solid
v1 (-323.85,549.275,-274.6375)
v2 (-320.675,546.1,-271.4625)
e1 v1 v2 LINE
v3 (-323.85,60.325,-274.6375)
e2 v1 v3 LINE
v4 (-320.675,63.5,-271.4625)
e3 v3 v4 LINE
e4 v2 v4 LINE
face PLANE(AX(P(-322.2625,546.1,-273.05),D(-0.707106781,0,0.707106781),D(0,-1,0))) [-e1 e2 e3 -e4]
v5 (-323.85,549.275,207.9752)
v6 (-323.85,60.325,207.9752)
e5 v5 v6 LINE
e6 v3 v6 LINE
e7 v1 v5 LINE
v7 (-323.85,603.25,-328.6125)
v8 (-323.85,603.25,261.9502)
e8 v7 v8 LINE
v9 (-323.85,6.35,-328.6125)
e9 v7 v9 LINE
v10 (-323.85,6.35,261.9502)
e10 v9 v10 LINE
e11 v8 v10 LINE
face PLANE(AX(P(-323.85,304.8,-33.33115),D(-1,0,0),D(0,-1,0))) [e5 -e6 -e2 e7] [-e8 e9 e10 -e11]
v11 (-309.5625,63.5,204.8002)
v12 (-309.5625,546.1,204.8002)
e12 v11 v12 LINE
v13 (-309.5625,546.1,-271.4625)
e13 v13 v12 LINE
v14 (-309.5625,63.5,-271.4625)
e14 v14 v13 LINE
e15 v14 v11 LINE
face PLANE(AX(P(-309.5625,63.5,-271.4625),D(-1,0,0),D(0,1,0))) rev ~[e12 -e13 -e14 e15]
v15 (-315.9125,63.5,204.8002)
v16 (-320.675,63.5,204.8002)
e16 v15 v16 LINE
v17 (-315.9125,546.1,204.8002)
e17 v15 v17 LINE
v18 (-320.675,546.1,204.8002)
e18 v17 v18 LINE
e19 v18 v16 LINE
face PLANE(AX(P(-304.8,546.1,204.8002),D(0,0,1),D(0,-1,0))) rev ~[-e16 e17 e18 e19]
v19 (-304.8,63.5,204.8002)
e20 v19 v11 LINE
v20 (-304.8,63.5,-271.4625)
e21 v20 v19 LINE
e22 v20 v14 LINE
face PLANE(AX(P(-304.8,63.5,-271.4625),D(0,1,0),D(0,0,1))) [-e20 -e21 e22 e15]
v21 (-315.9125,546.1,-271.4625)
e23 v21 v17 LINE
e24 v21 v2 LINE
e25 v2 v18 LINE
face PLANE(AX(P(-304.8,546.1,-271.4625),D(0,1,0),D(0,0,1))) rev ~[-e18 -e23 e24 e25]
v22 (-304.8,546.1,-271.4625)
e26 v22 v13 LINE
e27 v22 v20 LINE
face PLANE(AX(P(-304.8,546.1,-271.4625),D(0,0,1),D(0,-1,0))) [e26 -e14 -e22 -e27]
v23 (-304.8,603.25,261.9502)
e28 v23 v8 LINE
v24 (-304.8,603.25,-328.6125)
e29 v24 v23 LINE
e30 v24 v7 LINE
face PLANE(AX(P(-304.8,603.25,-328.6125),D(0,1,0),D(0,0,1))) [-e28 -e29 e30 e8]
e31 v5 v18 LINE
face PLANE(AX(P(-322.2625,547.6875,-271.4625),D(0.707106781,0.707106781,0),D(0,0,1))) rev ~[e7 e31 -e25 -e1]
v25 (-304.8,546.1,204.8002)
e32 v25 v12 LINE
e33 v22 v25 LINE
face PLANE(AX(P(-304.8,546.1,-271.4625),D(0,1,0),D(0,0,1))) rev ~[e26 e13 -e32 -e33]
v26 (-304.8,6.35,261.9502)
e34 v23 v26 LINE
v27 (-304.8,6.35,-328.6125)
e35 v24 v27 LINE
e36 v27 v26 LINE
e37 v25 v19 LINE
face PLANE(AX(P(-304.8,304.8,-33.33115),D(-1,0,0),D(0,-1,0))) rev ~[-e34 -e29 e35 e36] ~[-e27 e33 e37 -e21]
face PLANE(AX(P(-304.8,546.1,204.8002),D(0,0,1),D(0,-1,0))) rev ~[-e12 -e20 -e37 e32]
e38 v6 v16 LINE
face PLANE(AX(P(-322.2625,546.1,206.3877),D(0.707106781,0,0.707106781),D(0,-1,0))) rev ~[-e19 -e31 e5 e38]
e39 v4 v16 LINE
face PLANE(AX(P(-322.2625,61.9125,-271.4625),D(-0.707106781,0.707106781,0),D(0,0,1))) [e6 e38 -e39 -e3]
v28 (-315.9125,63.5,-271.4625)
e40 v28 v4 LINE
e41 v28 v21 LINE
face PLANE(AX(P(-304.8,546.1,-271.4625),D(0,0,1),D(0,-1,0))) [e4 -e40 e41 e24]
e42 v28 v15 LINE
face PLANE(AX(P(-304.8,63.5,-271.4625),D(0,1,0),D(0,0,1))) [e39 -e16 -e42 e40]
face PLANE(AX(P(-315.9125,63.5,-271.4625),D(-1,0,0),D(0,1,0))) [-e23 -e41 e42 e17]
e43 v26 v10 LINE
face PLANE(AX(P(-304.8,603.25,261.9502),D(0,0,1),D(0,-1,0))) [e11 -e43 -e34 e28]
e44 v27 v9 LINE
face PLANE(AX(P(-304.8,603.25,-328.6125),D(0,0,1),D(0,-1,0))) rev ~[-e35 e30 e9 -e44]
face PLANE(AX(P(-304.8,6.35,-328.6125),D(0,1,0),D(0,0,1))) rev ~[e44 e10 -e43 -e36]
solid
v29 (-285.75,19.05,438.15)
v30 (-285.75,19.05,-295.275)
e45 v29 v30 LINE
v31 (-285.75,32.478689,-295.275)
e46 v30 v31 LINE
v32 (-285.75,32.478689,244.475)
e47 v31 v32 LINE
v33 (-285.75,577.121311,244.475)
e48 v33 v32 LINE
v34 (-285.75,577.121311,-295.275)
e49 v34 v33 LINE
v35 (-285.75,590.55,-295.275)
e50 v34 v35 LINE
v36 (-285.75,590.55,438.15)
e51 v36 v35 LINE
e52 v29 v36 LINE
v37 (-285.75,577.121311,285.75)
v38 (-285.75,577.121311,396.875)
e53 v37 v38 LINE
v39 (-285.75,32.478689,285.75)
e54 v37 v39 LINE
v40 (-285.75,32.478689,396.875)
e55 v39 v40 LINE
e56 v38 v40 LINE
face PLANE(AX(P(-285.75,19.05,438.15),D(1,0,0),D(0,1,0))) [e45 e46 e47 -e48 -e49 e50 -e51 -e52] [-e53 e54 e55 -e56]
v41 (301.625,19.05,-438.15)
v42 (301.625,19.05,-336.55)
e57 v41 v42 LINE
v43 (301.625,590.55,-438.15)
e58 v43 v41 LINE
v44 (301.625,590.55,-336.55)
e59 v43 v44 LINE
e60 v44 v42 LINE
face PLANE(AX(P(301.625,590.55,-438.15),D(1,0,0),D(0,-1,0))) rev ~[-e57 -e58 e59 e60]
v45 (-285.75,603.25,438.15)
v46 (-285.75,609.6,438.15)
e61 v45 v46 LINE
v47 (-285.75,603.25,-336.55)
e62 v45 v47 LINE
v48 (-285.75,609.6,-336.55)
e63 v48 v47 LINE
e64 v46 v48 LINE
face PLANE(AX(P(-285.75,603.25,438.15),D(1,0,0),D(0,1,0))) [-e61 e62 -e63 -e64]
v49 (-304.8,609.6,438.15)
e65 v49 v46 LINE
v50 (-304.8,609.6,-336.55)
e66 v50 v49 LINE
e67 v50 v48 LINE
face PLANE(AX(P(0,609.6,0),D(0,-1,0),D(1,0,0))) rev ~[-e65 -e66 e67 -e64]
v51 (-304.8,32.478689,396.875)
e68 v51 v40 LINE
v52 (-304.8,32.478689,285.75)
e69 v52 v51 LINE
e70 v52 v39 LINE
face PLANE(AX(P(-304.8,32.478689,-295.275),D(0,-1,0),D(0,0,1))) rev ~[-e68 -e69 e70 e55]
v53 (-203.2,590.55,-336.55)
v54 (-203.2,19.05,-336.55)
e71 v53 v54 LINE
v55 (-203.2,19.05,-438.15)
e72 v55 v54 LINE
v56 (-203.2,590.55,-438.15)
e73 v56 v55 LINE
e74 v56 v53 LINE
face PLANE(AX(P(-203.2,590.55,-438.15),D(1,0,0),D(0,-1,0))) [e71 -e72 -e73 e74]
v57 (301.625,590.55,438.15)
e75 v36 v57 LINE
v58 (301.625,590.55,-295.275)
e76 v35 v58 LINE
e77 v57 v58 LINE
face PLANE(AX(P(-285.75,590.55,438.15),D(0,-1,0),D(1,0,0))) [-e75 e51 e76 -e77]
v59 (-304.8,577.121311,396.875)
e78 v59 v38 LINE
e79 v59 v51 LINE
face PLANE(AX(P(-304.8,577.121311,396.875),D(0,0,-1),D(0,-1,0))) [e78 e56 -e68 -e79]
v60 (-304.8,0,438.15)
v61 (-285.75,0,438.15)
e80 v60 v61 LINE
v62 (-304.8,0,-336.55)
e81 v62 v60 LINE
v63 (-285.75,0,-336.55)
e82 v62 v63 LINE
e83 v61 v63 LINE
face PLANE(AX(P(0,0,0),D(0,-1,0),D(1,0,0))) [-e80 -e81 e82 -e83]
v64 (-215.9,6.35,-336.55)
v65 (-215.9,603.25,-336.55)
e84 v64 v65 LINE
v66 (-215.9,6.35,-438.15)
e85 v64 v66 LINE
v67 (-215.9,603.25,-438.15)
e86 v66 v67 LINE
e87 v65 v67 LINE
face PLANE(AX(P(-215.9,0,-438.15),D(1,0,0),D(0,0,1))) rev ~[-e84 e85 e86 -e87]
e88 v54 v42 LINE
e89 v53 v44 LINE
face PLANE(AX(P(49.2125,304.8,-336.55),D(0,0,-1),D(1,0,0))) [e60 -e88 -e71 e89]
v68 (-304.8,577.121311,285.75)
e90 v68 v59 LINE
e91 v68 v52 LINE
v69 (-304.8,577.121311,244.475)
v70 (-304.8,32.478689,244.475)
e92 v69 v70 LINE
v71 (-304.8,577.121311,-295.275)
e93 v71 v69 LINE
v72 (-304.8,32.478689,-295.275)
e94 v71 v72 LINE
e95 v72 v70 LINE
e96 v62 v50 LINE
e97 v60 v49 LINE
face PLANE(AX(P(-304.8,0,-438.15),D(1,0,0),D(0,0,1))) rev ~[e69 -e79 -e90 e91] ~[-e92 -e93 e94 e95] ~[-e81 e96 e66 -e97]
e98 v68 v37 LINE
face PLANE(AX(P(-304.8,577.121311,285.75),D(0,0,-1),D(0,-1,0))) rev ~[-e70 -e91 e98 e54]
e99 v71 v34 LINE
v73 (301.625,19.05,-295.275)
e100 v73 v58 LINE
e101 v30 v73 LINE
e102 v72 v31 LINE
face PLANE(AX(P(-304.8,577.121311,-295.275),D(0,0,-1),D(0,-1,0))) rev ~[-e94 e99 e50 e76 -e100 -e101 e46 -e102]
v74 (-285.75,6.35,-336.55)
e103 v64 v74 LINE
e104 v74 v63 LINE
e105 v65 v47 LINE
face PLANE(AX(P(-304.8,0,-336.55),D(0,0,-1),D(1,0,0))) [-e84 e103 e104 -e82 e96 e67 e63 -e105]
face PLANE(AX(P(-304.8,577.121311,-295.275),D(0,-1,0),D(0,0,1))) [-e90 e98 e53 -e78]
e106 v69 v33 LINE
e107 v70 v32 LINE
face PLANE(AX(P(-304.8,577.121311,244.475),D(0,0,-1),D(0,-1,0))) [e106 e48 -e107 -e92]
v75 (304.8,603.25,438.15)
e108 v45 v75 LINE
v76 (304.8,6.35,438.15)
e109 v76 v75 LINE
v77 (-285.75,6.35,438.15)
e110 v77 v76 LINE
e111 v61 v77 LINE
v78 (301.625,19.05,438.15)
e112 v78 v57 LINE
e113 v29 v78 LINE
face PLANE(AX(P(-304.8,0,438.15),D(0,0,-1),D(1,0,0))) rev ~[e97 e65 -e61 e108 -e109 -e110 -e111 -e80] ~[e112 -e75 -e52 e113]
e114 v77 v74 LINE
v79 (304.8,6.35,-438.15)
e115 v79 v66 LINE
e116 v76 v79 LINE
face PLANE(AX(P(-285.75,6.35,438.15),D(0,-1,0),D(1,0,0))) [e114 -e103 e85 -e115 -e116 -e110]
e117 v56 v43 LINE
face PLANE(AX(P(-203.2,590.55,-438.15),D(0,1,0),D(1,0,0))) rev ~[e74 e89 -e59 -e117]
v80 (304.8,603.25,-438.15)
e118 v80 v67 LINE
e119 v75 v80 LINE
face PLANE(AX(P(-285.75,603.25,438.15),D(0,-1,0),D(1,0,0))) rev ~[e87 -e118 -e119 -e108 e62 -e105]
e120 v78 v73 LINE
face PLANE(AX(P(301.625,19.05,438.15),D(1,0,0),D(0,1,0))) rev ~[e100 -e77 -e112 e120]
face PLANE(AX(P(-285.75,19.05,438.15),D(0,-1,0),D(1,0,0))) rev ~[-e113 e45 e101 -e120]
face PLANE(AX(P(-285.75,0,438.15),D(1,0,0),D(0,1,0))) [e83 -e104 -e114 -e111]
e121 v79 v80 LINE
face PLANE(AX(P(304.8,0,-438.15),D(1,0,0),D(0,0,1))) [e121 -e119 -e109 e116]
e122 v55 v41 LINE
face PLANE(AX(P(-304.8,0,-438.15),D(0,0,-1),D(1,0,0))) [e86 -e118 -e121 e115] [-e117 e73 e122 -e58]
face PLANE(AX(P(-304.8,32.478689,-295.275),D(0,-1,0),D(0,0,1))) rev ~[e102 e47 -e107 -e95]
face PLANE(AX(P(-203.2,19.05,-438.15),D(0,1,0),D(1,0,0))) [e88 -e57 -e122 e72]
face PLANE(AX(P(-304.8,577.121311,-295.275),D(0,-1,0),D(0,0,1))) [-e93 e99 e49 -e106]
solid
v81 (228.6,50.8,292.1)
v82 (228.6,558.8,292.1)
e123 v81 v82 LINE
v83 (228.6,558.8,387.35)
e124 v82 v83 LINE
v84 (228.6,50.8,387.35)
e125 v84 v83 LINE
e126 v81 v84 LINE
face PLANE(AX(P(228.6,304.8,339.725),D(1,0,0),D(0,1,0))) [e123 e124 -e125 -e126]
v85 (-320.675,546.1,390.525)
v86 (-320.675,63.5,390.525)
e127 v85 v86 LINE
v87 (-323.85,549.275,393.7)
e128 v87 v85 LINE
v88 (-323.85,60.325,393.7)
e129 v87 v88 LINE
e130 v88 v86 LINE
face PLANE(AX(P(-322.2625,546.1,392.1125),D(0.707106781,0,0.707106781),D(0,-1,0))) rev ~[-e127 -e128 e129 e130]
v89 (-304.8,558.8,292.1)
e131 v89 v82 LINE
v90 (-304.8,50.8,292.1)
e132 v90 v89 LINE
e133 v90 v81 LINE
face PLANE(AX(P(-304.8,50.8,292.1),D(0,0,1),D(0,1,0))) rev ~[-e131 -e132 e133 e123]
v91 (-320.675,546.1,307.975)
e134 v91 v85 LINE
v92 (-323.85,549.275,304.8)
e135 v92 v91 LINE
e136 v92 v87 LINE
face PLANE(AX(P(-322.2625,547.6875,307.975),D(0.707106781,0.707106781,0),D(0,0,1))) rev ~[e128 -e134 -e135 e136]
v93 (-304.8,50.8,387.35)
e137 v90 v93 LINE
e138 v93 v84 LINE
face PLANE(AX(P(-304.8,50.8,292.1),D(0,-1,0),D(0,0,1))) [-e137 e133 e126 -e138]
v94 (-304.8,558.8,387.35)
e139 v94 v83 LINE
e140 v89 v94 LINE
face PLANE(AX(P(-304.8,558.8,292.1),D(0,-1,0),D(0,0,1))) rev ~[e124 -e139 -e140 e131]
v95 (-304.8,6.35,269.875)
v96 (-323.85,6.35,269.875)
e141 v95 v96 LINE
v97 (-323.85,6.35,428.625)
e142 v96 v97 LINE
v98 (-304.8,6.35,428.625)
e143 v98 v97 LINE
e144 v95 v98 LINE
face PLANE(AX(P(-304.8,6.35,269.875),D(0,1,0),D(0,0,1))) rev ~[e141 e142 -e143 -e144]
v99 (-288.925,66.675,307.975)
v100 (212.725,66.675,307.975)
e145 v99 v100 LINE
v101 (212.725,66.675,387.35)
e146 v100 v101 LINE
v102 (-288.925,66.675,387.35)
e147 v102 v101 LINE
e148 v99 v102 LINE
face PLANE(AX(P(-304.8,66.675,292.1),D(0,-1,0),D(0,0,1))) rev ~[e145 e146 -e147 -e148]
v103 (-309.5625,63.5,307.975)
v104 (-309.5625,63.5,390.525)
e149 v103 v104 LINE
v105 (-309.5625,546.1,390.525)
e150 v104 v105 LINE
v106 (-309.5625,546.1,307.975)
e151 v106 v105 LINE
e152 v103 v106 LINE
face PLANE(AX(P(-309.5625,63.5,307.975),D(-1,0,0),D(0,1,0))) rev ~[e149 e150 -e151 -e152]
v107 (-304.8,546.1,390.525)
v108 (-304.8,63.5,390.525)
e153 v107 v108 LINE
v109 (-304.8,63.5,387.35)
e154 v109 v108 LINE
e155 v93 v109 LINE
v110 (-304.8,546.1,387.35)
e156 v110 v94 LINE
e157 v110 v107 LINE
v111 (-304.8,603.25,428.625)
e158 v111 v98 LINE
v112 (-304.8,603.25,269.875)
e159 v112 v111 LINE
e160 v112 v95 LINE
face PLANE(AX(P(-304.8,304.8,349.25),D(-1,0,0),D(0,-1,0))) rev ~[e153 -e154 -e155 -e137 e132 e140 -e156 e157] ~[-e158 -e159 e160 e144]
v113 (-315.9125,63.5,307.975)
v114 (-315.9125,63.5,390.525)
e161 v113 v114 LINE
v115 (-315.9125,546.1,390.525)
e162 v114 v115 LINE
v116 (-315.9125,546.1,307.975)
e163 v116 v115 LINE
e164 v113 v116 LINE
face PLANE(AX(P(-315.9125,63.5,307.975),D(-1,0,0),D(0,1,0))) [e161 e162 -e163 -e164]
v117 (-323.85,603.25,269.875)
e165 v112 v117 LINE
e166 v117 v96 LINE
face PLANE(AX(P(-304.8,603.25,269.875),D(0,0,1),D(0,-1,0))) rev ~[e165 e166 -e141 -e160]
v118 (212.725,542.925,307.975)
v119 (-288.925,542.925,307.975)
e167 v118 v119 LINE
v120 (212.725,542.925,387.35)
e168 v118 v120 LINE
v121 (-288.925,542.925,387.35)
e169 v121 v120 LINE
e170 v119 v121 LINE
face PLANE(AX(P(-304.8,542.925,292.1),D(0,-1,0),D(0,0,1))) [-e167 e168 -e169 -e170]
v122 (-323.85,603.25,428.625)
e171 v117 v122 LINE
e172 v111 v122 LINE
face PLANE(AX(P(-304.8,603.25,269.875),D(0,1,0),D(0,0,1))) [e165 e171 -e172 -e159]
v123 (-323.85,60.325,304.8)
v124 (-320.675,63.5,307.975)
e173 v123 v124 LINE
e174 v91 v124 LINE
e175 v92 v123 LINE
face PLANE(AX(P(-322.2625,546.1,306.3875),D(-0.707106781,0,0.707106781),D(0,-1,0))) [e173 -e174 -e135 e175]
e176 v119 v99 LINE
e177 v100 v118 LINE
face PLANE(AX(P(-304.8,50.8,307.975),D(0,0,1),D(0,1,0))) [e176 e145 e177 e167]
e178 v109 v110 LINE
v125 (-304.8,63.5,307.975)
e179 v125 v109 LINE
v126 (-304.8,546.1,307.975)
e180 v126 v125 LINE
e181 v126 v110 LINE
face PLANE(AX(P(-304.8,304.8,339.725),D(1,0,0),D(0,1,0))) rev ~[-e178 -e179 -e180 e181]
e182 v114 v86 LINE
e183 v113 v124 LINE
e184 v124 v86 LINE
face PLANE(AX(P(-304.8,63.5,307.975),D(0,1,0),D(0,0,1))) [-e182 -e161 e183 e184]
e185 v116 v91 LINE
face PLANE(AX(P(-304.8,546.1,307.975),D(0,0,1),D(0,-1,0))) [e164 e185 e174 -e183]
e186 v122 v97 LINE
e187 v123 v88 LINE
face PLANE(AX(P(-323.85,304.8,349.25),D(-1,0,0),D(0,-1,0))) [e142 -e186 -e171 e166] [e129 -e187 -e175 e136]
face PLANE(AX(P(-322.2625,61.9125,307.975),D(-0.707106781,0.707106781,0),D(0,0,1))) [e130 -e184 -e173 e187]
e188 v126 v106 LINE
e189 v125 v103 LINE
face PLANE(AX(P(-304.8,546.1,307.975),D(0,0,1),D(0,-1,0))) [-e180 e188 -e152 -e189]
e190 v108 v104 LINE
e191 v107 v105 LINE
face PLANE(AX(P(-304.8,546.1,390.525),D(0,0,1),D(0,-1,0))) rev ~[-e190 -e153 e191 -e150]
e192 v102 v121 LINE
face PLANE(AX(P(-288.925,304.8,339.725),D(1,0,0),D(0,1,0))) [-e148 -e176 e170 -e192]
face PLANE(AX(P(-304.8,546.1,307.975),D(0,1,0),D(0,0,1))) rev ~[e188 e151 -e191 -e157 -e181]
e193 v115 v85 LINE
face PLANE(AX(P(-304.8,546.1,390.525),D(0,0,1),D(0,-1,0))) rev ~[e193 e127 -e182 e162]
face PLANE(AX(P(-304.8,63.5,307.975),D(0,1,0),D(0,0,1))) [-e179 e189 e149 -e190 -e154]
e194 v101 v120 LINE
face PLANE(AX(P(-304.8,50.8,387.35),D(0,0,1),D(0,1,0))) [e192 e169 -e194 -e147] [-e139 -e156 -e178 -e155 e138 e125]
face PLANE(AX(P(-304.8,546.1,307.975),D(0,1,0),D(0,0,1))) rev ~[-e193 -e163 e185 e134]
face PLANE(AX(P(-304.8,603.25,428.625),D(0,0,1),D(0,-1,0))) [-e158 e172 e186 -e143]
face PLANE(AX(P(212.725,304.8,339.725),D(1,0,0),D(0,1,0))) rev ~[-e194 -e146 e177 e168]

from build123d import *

# Parameters (mm, degrees)
F0_W          = 609.6
F0_H          = 876.3
F1_DEPTH      = 609.6
F2_W          = 88.9
F2_H          = 101.6
F3_DEPTH      = 609.601
F4_W          = 544.6426229508
F4_H          = 692.15
F5_DEPTH      = 19.05
F6_W          = 590.55
F6_H          = 6.35
F7_DEPTH      = 876.301
F8_W          = 587.375
F8_H          = 571.5
F9_DEPTH      = 733.425
F10_W         = 544.6426229508
F10_H         = 41.275
F11_DEPTH     = 19.05
F12_W         = 596.9
F12_H         = 590.5627
F12_W_2       = 482.6
F12_H_2       = 476.2627
F13_DEPTH     = 19.05
F14_W         = 6.35
F14_H         = 482.6
F15_DEPTH     = 476.2627
F16_SIZE      = 3.175
F17_W         = 596.9
F17_H         = 158.75
F17_W_2       = 482.6
F17_H_2       = 82.55
F18_DEPTH     = 19.05
F19_W         = 6.35
F19_H         = 482.6
F20_DEPTH     = 82.55
F21_SIZE      = 3.175
F22_W         = 504.825
F22_H         = 571.5
F23_DEPTH     = 101.6
F24_W         = 508
F24_H         = 95.25
F25_DEPTH     = 533.4
F26_T         = 15.875
F26_T3_DEPTH  = 37.249261314
F26_T5_DEPTH  = 37.249261314
F26_T7_DEPTH  = 37.249261314
F26_T9_DEPTH  = 37.249261314
F26_T11_DEPTH = 36.5125
F26_T13_DEPTH = 514.35
F26_T15_DEPTH = 114.3
F26_T17_DEPTH = 127
F26_T19_DEPTH = 539.75
F26_T21_DEPTH = 111.125
F26_T23_DEPTH = 36.5125


# Not quite as in the source:
# - a shell that OpenCascade refuses in one call is made with other operations: the cavity is built on its own and cut out


with BuildPart() as f1:
    # F0 (on Front) → F1 (new body)
    with BuildSketch(Plane.XZ):
        Rectangle(F0_W, F0_H)
    extrude(amount=-F1_DEPTH)

    # F2 (on face) → F3 (cut, through all)
    with BuildSketch(Plane.XZ):
        with Locations((-260.35, -387.35)):
            Rectangle(F2_W, F2_H)
    extrude(amount=-F3_DEPTH, mode=Mode.SUBTRACT)

    # F4 (on face) → F5 (cut)
    with BuildSketch(Plane(origin=(-304.8, 0, 0), x_dir=(0, -1, 0), z_dir=(-1, 0, 0))):
        with Locations((-304.8, 50.8)):
            Rectangle(F4_W, F4_H)
    extrude(amount=-F5_DEPTH, mode=Mode.SUBTRACT)

    # F6 (on face) → F7 (cut, through all)
    with BuildSketch(Plane.XY.offset(438.15)):
        with Locations((9.525, 606.425)):
            Rectangle(F6_W, F6_H)
        with Locations((9.525, 3.175)):
            Rectangle(F6_W, F6_H)
    extrude(amount=-F7_DEPTH, mode=Mode.SUBTRACT)

    # F8 (on face) → F9 (cut, through all)
    with BuildSketch(Plane.XY.offset(438.15)):
        with Locations((7.9375, 304.8)):
            Rectangle(F8_W, F8_H)
    extrude(amount=-F9_DEPTH, mode=Mode.SUBTRACT)

    # F10 (on face) → F11 (join, through all)
    with BuildSketch(Plane(origin=(-304.8, 0, 0), x_dir=(0, -1, 0), z_dir=(-1, 0, 0))):
        with Locations((-304.8, 265.1125)):
            Rectangle(F10_W, F10_H)
    extrude(amount=-F11_DEPTH)

    # F22 (on face) → F23 (cut)
    with BuildSketch(Plane(origin=(0, 0, -438.15), x_dir=(1, 0, 0), z_dir=(0, 0, -1))):
        with Locations((49.2125, -304.8)):
            Rectangle(F22_W, F22_H)
    extrude(amount=-F23_DEPTH, mode=Mode.SUBTRACT)


with BuildPart() as f13:
    # F12 (on face) → F13 (new body)
    with BuildSketch(Plane(origin=(-304.8, 0, 0), x_dir=(0, -1, 0), z_dir=(-1, 0, 0))):
        with Locations((-304.8, -33.33115)):
            Rectangle(F12_W, F12_H)
        with Locations((-304.8, -33.33115)):
            Rectangle(F12_W_2, F12_H_2, mode=Mode.SUBTRACT)
    extrude(amount=F13_DEPTH)

    # F14 (on face) → F15 (join, through all)
    with BuildSketch(Plane.XY.offset(-271.4625)):
        with Locations((-312.7375, 304.8)):
            Rectangle(F14_W, F14_H)
    extrude(amount=F15_DEPTH)

    # F16
    f16_edges = [f13.edges().sort_by_distance(p)[0] for p in [
        (-323.85, 546.1, -33.33115),
        (-323.85, 304.8, -271.4625),
        (-323.85, 63.5, -33.33115),
        (-323.85, 304.8, 204.8002),
    ]]
    chamfer(f16_edges, length=F16_SIZE)


with BuildPart() as f18:
    # F17 (on face) → F18 (new body)
    with BuildSketch(Plane(origin=(-304.8, 0, 0), x_dir=(0, -1, 0), z_dir=(-1, 0, 0))):
        with Locations((-304.8, 349.25)):
            Rectangle(F17_W, F17_H)
        with Locations((-304.8, 349.25)):
            Rectangle(F17_W_2, F17_H_2, mode=Mode.SUBTRACT)
    extrude(amount=F18_DEPTH)

    # F19 (on face) → F20 (join, through all)
    with BuildSketch(Plane.XY.offset(307.975)):
        with Locations((-312.7375, 304.8)):
            Rectangle(F19_W, F19_H)
    extrude(amount=F20_DEPTH)

    # F21
    f21_edges = [f18.edges().sort_by_distance(p)[0] for p in [
        (-323.85, 304.8, 307.975),
        (-323.85, 546.1, 349.25),
        (-323.85, 304.8, 390.525),
        (-323.85, 63.5, 349.25),
    ]]
    chamfer(f21_edges, length=F21_SIZE)

    # F24 (on face) → F25 (join)
    with BuildSketch(Plane.YZ.offset(-304.8)):
        with Locations((304.8, 339.725)):
            Rectangle(F24_W, F24_H)
    extrude(amount=F25_DEPTH)

    # F26: shell of thickness 15.875, made by hand


with BuildPart() as f26_core1:
    # F26_t2: copy of F18
    add(f18.part)

    # the walls: a layer under each face that stays
    f26_faces = [f26_core1.faces().sort_by_distance(p)[0] for p in [
        (-323.85, 503.7666666667, 296.3333333333),
        (-322.2625, 304.8, 306.3875),
        (-322.2625, 61.9125, 349.25),
        (-322.2625, 547.6875, 349.25),
        (-322.2625, 304.8, 392.1125),
        (-314.325, 304.8, 428.625),
        (-314.325, 603.25, 349.25),
        (-314.325, 304.8, 269.875),
        (-314.325, 6.35, 349.25),
        (-318.29375, 304.8, 307.975),
        (-318.29375, 63.5, 349.25),
        (-318.29375, 546.1, 349.25),
        (-318.29375, 304.8, 390.525),
        (-304.8, 503.7666666667, 402.1666666667),
        (-315.9125, 304.8, 349.25),
        (-38.1, 558.8, 339.725),
        (-38.1, 304.8, 292.1),
        (-38.1, 50.8, 339.725),
        (-307.18125, 63.5, 349.25),
        (-307.18125, 304.8, 390.525),
        (-307.18125, 546.1, 349.25),
        (-304.8, 304.8, 347.6625),
        (228.6, 304.8, 339.725),
        (-307.18125, 304.8, 307.975),
        (-309.5625, 304.8, 349.25),
    ]]
    thicken(f26_faces, amount=-F26_T, mode=Mode.SUBTRACT)

    # F26_s4 → F26_t3 (cut)
    with BuildSketch(Plane(origin=(4.5928978099, 4.5928978099, 4.5928978099), x_dir=(-0.7071067812, 0.7071067812, 0), z_dir=(0.5773502692, 0.5773502692, 0.5773502692))):
        Polygon((271.8908726623, 356.5892701441), (263.7152476623, 342.7036353262), (255.7777476623, 347.2863530879), (255.7777476623, 356.4517886113), align=None)
    extrude(amount=F26_T3_DEPTH, mode=Mode.SUBTRACT)

    # F26_s6 → F26_t5 (cut)
    with BuildSketch(Plane(origin=(-198.6071021901, 198.60710219, -198.6071021901), x_dir=(0.7071067812, 0.7071067812, 0), z_dir=(0.5773502692, -0.5773502692, 0.5773502692))):
        Polygon((159.161421149, 605.4574280109), (167.337046149, 591.571793193), (175.274546149, 596.1545109546), (175.274546149, 605.319946478), align=None)
    extrude(amount=F26_T5_DEPTH, mode=Mode.SUBTRACT)

    # F26_s8 → F26_t7 (cut)
    with BuildSketch(Plane(origin=(-228.2404355234, -228.2404355234, 228.2404355234), x_dir=(-0.7071067812, 0.7071067812, 0), z_dir=(0.5773502692, 0.5773502692, -0.5773502692))):
        Polygon((271.8908726623, 213.7335916339), (255.7777476623, 213.8710731668), (255.7777476623, 223.0365086901), (263.7152476623, 227.6192264518), align=None)
    extrude(amount=F26_T7_DEPTH, mode=Mode.SUBTRACT)

    # F26_s10 → F26_t9 (cut)
    with BuildSketch(Plane(origin=(-431.4404355234, 431.4404355234, 431.4404355234), x_dir=(0.7071067812, 0.7071067812, 0), z_dir=(0.5773502692, -0.5773502692, -0.5773502692))):
        Polygon((159.161421149, -35.1345662329), (175.274546149, -34.9970847), (175.274546149, -25.8316491766), (167.337046149, -21.2489314149), align=None)
    extrude(amount=F26_T9_DEPTH, mode=Mode.SUBTRACT)

    # F26_s12 → F26_t11 (cut)
    with BuildSketch(Plane.YZ.offset(-336.55)):
        Polygon((545.94125, 308.13375), (546.1, 292.1), (561.975, 292.1), (561.975, 307.975), align=None)
        Polygon((63.65875, 308.13375), (63.5, 292.1), (47.625, 292.1), (47.625, 307.975), align=None)
        Polygon((63.65875, 390.36625), (47.625, 390.525), (47.625, 406.4), (63.5, 406.4), align=None)
        Polygon((545.94125, 390.36625), (561.975, 390.525), (561.975, 406.4), (546.1, 406.4), align=None)
    extrude(amount=F26_T11_DEPTH, mode=Mode.SUBTRACT)

    # F26_s14 → F26_t13 (cut)
    with BuildSketch(Plane.XZ.offset(-561.975)):
        Polygon((-316.07125, 308.13375), (-315.9125, 292.1), (-300.0375, 292.1), (-300.0375, 307.975), align=None)
        Polygon((-316.07125, 390.36625), (-315.9125, 406.4), (-300.0375, 406.4), (-300.0375, 390.525), align=None)
        Polygon((-309.40375, 390.36625), (-309.5625, 406.4), (-325.4375, 406.4), (-325.4375, 390.525), align=None)
        Polygon((-304.95875, 308.13375), (-288.925, 307.975), (-288.925, 292.1), (-304.8, 292.1), align=None)
        Polygon((-309.40375, 308.13375), (-309.5625, 292.1), (-325.4375, 292.1), (-325.4375, 307.975), align=None)
    extrude(amount=F26_T13_DEPTH, mode=Mode.SUBTRACT)

    # F26_s16 → F26_t15 (cut)
    with BuildSketch(Plane.XY.offset(292.1)):
        Polygon((-316.07125, 63.65875), (-315.9125, 47.625), (-300.0375, 47.625), (-300.0375, 63.5), align=None)
        Polygon((-316.07125, 545.94125), (-315.9125, 561.975), (-300.0375, 561.975), (-300.0375, 546.1), align=None)
        Polygon((-309.40375, 63.65875), (-309.5625, 47.625), (-325.4375, 47.625), (-325.4375, 63.5), align=None)
        Polygon((-309.40375, 545.94125), (-309.5625, 561.975), (-325.4375, 561.975), (-325.4375, 546.1), align=None)
    extrude(amount=F26_T15_DEPTH, mode=Mode.SUBTRACT)

    # F26_s18 → F26_t17 (cut)
    with BuildSketch(Plane.XY.offset(276.225)):
        Polygon((-304.64125, 558.95875), (-320.675, 558.8), (-320.675, 542.925), (-304.8, 542.925), align=None)
        Polygon((-304.64125, 50.64125), (-320.675, 50.8), (-320.675, 66.675), (-304.8, 66.675), align=None)
    extrude(amount=F26_T17_DEPTH, mode=Mode.SUBTRACT)

    # F26_s20 → F26_t19 (cut)
    with BuildSketch(Plane.XZ.offset(-574.675)):
        Polygon((-304.64125, 291.94125), (-320.675, 292.1), (-320.675, 307.975), (-304.8, 307.975), align=None)
    extrude(amount=F26_T19_DEPTH, mode=Mode.SUBTRACT)

    # F26_s22 → F26_t21 (cut)
    with BuildSketch(Plane.XY.offset(292.1)):
        Polygon((-304.95875, 63.65875), (-304.8, 47.625), (-288.925, 47.625), (-288.925, 63.5), align=None)
        Polygon((-304.95875, 545.94125), (-304.8, 561.975), (-288.925, 561.975), (-288.925, 546.1), align=None)
    extrude(amount=F26_T21_DEPTH, mode=Mode.SUBTRACT)

    # F26_s24 → F26_t23 (cut)
    with BuildSketch(Plane.YZ.offset(-325.4375)):
        Polygon((63.65875, 308.13375), (47.625, 307.975), (47.625, 292.1), (63.5, 292.1), align=None)
        Polygon((63.65875, 390.36625), (47.625, 390.525), (47.625, 406.4), (63.5, 406.4), align=None)
        Polygon((545.94125, 390.36625), (546.1, 406.4), (561.975, 406.4), (561.975, 390.525), align=None)
        Polygon((545.94125, 308.13375), (561.975, 307.975), (561.975, 292.1), (546.1, 292.1), align=None)
    extrude(amount=F26_T23_DEPTH, mode=Mode.SUBTRACT)


with BuildPart() as f18_1:
    add(f18.part)

    # what is left inside the walls is the cavity
    f26_cavity = [f26_core1.part.solids().sort_by_distance(p)[0] for p in [
        (45.508333, 304.8, 308.13375),
    ]]
    add(f26_cavity, mode=Mode.SUBTRACT)


solid = Compound([f1.part, f13.part, f18_1.part])
